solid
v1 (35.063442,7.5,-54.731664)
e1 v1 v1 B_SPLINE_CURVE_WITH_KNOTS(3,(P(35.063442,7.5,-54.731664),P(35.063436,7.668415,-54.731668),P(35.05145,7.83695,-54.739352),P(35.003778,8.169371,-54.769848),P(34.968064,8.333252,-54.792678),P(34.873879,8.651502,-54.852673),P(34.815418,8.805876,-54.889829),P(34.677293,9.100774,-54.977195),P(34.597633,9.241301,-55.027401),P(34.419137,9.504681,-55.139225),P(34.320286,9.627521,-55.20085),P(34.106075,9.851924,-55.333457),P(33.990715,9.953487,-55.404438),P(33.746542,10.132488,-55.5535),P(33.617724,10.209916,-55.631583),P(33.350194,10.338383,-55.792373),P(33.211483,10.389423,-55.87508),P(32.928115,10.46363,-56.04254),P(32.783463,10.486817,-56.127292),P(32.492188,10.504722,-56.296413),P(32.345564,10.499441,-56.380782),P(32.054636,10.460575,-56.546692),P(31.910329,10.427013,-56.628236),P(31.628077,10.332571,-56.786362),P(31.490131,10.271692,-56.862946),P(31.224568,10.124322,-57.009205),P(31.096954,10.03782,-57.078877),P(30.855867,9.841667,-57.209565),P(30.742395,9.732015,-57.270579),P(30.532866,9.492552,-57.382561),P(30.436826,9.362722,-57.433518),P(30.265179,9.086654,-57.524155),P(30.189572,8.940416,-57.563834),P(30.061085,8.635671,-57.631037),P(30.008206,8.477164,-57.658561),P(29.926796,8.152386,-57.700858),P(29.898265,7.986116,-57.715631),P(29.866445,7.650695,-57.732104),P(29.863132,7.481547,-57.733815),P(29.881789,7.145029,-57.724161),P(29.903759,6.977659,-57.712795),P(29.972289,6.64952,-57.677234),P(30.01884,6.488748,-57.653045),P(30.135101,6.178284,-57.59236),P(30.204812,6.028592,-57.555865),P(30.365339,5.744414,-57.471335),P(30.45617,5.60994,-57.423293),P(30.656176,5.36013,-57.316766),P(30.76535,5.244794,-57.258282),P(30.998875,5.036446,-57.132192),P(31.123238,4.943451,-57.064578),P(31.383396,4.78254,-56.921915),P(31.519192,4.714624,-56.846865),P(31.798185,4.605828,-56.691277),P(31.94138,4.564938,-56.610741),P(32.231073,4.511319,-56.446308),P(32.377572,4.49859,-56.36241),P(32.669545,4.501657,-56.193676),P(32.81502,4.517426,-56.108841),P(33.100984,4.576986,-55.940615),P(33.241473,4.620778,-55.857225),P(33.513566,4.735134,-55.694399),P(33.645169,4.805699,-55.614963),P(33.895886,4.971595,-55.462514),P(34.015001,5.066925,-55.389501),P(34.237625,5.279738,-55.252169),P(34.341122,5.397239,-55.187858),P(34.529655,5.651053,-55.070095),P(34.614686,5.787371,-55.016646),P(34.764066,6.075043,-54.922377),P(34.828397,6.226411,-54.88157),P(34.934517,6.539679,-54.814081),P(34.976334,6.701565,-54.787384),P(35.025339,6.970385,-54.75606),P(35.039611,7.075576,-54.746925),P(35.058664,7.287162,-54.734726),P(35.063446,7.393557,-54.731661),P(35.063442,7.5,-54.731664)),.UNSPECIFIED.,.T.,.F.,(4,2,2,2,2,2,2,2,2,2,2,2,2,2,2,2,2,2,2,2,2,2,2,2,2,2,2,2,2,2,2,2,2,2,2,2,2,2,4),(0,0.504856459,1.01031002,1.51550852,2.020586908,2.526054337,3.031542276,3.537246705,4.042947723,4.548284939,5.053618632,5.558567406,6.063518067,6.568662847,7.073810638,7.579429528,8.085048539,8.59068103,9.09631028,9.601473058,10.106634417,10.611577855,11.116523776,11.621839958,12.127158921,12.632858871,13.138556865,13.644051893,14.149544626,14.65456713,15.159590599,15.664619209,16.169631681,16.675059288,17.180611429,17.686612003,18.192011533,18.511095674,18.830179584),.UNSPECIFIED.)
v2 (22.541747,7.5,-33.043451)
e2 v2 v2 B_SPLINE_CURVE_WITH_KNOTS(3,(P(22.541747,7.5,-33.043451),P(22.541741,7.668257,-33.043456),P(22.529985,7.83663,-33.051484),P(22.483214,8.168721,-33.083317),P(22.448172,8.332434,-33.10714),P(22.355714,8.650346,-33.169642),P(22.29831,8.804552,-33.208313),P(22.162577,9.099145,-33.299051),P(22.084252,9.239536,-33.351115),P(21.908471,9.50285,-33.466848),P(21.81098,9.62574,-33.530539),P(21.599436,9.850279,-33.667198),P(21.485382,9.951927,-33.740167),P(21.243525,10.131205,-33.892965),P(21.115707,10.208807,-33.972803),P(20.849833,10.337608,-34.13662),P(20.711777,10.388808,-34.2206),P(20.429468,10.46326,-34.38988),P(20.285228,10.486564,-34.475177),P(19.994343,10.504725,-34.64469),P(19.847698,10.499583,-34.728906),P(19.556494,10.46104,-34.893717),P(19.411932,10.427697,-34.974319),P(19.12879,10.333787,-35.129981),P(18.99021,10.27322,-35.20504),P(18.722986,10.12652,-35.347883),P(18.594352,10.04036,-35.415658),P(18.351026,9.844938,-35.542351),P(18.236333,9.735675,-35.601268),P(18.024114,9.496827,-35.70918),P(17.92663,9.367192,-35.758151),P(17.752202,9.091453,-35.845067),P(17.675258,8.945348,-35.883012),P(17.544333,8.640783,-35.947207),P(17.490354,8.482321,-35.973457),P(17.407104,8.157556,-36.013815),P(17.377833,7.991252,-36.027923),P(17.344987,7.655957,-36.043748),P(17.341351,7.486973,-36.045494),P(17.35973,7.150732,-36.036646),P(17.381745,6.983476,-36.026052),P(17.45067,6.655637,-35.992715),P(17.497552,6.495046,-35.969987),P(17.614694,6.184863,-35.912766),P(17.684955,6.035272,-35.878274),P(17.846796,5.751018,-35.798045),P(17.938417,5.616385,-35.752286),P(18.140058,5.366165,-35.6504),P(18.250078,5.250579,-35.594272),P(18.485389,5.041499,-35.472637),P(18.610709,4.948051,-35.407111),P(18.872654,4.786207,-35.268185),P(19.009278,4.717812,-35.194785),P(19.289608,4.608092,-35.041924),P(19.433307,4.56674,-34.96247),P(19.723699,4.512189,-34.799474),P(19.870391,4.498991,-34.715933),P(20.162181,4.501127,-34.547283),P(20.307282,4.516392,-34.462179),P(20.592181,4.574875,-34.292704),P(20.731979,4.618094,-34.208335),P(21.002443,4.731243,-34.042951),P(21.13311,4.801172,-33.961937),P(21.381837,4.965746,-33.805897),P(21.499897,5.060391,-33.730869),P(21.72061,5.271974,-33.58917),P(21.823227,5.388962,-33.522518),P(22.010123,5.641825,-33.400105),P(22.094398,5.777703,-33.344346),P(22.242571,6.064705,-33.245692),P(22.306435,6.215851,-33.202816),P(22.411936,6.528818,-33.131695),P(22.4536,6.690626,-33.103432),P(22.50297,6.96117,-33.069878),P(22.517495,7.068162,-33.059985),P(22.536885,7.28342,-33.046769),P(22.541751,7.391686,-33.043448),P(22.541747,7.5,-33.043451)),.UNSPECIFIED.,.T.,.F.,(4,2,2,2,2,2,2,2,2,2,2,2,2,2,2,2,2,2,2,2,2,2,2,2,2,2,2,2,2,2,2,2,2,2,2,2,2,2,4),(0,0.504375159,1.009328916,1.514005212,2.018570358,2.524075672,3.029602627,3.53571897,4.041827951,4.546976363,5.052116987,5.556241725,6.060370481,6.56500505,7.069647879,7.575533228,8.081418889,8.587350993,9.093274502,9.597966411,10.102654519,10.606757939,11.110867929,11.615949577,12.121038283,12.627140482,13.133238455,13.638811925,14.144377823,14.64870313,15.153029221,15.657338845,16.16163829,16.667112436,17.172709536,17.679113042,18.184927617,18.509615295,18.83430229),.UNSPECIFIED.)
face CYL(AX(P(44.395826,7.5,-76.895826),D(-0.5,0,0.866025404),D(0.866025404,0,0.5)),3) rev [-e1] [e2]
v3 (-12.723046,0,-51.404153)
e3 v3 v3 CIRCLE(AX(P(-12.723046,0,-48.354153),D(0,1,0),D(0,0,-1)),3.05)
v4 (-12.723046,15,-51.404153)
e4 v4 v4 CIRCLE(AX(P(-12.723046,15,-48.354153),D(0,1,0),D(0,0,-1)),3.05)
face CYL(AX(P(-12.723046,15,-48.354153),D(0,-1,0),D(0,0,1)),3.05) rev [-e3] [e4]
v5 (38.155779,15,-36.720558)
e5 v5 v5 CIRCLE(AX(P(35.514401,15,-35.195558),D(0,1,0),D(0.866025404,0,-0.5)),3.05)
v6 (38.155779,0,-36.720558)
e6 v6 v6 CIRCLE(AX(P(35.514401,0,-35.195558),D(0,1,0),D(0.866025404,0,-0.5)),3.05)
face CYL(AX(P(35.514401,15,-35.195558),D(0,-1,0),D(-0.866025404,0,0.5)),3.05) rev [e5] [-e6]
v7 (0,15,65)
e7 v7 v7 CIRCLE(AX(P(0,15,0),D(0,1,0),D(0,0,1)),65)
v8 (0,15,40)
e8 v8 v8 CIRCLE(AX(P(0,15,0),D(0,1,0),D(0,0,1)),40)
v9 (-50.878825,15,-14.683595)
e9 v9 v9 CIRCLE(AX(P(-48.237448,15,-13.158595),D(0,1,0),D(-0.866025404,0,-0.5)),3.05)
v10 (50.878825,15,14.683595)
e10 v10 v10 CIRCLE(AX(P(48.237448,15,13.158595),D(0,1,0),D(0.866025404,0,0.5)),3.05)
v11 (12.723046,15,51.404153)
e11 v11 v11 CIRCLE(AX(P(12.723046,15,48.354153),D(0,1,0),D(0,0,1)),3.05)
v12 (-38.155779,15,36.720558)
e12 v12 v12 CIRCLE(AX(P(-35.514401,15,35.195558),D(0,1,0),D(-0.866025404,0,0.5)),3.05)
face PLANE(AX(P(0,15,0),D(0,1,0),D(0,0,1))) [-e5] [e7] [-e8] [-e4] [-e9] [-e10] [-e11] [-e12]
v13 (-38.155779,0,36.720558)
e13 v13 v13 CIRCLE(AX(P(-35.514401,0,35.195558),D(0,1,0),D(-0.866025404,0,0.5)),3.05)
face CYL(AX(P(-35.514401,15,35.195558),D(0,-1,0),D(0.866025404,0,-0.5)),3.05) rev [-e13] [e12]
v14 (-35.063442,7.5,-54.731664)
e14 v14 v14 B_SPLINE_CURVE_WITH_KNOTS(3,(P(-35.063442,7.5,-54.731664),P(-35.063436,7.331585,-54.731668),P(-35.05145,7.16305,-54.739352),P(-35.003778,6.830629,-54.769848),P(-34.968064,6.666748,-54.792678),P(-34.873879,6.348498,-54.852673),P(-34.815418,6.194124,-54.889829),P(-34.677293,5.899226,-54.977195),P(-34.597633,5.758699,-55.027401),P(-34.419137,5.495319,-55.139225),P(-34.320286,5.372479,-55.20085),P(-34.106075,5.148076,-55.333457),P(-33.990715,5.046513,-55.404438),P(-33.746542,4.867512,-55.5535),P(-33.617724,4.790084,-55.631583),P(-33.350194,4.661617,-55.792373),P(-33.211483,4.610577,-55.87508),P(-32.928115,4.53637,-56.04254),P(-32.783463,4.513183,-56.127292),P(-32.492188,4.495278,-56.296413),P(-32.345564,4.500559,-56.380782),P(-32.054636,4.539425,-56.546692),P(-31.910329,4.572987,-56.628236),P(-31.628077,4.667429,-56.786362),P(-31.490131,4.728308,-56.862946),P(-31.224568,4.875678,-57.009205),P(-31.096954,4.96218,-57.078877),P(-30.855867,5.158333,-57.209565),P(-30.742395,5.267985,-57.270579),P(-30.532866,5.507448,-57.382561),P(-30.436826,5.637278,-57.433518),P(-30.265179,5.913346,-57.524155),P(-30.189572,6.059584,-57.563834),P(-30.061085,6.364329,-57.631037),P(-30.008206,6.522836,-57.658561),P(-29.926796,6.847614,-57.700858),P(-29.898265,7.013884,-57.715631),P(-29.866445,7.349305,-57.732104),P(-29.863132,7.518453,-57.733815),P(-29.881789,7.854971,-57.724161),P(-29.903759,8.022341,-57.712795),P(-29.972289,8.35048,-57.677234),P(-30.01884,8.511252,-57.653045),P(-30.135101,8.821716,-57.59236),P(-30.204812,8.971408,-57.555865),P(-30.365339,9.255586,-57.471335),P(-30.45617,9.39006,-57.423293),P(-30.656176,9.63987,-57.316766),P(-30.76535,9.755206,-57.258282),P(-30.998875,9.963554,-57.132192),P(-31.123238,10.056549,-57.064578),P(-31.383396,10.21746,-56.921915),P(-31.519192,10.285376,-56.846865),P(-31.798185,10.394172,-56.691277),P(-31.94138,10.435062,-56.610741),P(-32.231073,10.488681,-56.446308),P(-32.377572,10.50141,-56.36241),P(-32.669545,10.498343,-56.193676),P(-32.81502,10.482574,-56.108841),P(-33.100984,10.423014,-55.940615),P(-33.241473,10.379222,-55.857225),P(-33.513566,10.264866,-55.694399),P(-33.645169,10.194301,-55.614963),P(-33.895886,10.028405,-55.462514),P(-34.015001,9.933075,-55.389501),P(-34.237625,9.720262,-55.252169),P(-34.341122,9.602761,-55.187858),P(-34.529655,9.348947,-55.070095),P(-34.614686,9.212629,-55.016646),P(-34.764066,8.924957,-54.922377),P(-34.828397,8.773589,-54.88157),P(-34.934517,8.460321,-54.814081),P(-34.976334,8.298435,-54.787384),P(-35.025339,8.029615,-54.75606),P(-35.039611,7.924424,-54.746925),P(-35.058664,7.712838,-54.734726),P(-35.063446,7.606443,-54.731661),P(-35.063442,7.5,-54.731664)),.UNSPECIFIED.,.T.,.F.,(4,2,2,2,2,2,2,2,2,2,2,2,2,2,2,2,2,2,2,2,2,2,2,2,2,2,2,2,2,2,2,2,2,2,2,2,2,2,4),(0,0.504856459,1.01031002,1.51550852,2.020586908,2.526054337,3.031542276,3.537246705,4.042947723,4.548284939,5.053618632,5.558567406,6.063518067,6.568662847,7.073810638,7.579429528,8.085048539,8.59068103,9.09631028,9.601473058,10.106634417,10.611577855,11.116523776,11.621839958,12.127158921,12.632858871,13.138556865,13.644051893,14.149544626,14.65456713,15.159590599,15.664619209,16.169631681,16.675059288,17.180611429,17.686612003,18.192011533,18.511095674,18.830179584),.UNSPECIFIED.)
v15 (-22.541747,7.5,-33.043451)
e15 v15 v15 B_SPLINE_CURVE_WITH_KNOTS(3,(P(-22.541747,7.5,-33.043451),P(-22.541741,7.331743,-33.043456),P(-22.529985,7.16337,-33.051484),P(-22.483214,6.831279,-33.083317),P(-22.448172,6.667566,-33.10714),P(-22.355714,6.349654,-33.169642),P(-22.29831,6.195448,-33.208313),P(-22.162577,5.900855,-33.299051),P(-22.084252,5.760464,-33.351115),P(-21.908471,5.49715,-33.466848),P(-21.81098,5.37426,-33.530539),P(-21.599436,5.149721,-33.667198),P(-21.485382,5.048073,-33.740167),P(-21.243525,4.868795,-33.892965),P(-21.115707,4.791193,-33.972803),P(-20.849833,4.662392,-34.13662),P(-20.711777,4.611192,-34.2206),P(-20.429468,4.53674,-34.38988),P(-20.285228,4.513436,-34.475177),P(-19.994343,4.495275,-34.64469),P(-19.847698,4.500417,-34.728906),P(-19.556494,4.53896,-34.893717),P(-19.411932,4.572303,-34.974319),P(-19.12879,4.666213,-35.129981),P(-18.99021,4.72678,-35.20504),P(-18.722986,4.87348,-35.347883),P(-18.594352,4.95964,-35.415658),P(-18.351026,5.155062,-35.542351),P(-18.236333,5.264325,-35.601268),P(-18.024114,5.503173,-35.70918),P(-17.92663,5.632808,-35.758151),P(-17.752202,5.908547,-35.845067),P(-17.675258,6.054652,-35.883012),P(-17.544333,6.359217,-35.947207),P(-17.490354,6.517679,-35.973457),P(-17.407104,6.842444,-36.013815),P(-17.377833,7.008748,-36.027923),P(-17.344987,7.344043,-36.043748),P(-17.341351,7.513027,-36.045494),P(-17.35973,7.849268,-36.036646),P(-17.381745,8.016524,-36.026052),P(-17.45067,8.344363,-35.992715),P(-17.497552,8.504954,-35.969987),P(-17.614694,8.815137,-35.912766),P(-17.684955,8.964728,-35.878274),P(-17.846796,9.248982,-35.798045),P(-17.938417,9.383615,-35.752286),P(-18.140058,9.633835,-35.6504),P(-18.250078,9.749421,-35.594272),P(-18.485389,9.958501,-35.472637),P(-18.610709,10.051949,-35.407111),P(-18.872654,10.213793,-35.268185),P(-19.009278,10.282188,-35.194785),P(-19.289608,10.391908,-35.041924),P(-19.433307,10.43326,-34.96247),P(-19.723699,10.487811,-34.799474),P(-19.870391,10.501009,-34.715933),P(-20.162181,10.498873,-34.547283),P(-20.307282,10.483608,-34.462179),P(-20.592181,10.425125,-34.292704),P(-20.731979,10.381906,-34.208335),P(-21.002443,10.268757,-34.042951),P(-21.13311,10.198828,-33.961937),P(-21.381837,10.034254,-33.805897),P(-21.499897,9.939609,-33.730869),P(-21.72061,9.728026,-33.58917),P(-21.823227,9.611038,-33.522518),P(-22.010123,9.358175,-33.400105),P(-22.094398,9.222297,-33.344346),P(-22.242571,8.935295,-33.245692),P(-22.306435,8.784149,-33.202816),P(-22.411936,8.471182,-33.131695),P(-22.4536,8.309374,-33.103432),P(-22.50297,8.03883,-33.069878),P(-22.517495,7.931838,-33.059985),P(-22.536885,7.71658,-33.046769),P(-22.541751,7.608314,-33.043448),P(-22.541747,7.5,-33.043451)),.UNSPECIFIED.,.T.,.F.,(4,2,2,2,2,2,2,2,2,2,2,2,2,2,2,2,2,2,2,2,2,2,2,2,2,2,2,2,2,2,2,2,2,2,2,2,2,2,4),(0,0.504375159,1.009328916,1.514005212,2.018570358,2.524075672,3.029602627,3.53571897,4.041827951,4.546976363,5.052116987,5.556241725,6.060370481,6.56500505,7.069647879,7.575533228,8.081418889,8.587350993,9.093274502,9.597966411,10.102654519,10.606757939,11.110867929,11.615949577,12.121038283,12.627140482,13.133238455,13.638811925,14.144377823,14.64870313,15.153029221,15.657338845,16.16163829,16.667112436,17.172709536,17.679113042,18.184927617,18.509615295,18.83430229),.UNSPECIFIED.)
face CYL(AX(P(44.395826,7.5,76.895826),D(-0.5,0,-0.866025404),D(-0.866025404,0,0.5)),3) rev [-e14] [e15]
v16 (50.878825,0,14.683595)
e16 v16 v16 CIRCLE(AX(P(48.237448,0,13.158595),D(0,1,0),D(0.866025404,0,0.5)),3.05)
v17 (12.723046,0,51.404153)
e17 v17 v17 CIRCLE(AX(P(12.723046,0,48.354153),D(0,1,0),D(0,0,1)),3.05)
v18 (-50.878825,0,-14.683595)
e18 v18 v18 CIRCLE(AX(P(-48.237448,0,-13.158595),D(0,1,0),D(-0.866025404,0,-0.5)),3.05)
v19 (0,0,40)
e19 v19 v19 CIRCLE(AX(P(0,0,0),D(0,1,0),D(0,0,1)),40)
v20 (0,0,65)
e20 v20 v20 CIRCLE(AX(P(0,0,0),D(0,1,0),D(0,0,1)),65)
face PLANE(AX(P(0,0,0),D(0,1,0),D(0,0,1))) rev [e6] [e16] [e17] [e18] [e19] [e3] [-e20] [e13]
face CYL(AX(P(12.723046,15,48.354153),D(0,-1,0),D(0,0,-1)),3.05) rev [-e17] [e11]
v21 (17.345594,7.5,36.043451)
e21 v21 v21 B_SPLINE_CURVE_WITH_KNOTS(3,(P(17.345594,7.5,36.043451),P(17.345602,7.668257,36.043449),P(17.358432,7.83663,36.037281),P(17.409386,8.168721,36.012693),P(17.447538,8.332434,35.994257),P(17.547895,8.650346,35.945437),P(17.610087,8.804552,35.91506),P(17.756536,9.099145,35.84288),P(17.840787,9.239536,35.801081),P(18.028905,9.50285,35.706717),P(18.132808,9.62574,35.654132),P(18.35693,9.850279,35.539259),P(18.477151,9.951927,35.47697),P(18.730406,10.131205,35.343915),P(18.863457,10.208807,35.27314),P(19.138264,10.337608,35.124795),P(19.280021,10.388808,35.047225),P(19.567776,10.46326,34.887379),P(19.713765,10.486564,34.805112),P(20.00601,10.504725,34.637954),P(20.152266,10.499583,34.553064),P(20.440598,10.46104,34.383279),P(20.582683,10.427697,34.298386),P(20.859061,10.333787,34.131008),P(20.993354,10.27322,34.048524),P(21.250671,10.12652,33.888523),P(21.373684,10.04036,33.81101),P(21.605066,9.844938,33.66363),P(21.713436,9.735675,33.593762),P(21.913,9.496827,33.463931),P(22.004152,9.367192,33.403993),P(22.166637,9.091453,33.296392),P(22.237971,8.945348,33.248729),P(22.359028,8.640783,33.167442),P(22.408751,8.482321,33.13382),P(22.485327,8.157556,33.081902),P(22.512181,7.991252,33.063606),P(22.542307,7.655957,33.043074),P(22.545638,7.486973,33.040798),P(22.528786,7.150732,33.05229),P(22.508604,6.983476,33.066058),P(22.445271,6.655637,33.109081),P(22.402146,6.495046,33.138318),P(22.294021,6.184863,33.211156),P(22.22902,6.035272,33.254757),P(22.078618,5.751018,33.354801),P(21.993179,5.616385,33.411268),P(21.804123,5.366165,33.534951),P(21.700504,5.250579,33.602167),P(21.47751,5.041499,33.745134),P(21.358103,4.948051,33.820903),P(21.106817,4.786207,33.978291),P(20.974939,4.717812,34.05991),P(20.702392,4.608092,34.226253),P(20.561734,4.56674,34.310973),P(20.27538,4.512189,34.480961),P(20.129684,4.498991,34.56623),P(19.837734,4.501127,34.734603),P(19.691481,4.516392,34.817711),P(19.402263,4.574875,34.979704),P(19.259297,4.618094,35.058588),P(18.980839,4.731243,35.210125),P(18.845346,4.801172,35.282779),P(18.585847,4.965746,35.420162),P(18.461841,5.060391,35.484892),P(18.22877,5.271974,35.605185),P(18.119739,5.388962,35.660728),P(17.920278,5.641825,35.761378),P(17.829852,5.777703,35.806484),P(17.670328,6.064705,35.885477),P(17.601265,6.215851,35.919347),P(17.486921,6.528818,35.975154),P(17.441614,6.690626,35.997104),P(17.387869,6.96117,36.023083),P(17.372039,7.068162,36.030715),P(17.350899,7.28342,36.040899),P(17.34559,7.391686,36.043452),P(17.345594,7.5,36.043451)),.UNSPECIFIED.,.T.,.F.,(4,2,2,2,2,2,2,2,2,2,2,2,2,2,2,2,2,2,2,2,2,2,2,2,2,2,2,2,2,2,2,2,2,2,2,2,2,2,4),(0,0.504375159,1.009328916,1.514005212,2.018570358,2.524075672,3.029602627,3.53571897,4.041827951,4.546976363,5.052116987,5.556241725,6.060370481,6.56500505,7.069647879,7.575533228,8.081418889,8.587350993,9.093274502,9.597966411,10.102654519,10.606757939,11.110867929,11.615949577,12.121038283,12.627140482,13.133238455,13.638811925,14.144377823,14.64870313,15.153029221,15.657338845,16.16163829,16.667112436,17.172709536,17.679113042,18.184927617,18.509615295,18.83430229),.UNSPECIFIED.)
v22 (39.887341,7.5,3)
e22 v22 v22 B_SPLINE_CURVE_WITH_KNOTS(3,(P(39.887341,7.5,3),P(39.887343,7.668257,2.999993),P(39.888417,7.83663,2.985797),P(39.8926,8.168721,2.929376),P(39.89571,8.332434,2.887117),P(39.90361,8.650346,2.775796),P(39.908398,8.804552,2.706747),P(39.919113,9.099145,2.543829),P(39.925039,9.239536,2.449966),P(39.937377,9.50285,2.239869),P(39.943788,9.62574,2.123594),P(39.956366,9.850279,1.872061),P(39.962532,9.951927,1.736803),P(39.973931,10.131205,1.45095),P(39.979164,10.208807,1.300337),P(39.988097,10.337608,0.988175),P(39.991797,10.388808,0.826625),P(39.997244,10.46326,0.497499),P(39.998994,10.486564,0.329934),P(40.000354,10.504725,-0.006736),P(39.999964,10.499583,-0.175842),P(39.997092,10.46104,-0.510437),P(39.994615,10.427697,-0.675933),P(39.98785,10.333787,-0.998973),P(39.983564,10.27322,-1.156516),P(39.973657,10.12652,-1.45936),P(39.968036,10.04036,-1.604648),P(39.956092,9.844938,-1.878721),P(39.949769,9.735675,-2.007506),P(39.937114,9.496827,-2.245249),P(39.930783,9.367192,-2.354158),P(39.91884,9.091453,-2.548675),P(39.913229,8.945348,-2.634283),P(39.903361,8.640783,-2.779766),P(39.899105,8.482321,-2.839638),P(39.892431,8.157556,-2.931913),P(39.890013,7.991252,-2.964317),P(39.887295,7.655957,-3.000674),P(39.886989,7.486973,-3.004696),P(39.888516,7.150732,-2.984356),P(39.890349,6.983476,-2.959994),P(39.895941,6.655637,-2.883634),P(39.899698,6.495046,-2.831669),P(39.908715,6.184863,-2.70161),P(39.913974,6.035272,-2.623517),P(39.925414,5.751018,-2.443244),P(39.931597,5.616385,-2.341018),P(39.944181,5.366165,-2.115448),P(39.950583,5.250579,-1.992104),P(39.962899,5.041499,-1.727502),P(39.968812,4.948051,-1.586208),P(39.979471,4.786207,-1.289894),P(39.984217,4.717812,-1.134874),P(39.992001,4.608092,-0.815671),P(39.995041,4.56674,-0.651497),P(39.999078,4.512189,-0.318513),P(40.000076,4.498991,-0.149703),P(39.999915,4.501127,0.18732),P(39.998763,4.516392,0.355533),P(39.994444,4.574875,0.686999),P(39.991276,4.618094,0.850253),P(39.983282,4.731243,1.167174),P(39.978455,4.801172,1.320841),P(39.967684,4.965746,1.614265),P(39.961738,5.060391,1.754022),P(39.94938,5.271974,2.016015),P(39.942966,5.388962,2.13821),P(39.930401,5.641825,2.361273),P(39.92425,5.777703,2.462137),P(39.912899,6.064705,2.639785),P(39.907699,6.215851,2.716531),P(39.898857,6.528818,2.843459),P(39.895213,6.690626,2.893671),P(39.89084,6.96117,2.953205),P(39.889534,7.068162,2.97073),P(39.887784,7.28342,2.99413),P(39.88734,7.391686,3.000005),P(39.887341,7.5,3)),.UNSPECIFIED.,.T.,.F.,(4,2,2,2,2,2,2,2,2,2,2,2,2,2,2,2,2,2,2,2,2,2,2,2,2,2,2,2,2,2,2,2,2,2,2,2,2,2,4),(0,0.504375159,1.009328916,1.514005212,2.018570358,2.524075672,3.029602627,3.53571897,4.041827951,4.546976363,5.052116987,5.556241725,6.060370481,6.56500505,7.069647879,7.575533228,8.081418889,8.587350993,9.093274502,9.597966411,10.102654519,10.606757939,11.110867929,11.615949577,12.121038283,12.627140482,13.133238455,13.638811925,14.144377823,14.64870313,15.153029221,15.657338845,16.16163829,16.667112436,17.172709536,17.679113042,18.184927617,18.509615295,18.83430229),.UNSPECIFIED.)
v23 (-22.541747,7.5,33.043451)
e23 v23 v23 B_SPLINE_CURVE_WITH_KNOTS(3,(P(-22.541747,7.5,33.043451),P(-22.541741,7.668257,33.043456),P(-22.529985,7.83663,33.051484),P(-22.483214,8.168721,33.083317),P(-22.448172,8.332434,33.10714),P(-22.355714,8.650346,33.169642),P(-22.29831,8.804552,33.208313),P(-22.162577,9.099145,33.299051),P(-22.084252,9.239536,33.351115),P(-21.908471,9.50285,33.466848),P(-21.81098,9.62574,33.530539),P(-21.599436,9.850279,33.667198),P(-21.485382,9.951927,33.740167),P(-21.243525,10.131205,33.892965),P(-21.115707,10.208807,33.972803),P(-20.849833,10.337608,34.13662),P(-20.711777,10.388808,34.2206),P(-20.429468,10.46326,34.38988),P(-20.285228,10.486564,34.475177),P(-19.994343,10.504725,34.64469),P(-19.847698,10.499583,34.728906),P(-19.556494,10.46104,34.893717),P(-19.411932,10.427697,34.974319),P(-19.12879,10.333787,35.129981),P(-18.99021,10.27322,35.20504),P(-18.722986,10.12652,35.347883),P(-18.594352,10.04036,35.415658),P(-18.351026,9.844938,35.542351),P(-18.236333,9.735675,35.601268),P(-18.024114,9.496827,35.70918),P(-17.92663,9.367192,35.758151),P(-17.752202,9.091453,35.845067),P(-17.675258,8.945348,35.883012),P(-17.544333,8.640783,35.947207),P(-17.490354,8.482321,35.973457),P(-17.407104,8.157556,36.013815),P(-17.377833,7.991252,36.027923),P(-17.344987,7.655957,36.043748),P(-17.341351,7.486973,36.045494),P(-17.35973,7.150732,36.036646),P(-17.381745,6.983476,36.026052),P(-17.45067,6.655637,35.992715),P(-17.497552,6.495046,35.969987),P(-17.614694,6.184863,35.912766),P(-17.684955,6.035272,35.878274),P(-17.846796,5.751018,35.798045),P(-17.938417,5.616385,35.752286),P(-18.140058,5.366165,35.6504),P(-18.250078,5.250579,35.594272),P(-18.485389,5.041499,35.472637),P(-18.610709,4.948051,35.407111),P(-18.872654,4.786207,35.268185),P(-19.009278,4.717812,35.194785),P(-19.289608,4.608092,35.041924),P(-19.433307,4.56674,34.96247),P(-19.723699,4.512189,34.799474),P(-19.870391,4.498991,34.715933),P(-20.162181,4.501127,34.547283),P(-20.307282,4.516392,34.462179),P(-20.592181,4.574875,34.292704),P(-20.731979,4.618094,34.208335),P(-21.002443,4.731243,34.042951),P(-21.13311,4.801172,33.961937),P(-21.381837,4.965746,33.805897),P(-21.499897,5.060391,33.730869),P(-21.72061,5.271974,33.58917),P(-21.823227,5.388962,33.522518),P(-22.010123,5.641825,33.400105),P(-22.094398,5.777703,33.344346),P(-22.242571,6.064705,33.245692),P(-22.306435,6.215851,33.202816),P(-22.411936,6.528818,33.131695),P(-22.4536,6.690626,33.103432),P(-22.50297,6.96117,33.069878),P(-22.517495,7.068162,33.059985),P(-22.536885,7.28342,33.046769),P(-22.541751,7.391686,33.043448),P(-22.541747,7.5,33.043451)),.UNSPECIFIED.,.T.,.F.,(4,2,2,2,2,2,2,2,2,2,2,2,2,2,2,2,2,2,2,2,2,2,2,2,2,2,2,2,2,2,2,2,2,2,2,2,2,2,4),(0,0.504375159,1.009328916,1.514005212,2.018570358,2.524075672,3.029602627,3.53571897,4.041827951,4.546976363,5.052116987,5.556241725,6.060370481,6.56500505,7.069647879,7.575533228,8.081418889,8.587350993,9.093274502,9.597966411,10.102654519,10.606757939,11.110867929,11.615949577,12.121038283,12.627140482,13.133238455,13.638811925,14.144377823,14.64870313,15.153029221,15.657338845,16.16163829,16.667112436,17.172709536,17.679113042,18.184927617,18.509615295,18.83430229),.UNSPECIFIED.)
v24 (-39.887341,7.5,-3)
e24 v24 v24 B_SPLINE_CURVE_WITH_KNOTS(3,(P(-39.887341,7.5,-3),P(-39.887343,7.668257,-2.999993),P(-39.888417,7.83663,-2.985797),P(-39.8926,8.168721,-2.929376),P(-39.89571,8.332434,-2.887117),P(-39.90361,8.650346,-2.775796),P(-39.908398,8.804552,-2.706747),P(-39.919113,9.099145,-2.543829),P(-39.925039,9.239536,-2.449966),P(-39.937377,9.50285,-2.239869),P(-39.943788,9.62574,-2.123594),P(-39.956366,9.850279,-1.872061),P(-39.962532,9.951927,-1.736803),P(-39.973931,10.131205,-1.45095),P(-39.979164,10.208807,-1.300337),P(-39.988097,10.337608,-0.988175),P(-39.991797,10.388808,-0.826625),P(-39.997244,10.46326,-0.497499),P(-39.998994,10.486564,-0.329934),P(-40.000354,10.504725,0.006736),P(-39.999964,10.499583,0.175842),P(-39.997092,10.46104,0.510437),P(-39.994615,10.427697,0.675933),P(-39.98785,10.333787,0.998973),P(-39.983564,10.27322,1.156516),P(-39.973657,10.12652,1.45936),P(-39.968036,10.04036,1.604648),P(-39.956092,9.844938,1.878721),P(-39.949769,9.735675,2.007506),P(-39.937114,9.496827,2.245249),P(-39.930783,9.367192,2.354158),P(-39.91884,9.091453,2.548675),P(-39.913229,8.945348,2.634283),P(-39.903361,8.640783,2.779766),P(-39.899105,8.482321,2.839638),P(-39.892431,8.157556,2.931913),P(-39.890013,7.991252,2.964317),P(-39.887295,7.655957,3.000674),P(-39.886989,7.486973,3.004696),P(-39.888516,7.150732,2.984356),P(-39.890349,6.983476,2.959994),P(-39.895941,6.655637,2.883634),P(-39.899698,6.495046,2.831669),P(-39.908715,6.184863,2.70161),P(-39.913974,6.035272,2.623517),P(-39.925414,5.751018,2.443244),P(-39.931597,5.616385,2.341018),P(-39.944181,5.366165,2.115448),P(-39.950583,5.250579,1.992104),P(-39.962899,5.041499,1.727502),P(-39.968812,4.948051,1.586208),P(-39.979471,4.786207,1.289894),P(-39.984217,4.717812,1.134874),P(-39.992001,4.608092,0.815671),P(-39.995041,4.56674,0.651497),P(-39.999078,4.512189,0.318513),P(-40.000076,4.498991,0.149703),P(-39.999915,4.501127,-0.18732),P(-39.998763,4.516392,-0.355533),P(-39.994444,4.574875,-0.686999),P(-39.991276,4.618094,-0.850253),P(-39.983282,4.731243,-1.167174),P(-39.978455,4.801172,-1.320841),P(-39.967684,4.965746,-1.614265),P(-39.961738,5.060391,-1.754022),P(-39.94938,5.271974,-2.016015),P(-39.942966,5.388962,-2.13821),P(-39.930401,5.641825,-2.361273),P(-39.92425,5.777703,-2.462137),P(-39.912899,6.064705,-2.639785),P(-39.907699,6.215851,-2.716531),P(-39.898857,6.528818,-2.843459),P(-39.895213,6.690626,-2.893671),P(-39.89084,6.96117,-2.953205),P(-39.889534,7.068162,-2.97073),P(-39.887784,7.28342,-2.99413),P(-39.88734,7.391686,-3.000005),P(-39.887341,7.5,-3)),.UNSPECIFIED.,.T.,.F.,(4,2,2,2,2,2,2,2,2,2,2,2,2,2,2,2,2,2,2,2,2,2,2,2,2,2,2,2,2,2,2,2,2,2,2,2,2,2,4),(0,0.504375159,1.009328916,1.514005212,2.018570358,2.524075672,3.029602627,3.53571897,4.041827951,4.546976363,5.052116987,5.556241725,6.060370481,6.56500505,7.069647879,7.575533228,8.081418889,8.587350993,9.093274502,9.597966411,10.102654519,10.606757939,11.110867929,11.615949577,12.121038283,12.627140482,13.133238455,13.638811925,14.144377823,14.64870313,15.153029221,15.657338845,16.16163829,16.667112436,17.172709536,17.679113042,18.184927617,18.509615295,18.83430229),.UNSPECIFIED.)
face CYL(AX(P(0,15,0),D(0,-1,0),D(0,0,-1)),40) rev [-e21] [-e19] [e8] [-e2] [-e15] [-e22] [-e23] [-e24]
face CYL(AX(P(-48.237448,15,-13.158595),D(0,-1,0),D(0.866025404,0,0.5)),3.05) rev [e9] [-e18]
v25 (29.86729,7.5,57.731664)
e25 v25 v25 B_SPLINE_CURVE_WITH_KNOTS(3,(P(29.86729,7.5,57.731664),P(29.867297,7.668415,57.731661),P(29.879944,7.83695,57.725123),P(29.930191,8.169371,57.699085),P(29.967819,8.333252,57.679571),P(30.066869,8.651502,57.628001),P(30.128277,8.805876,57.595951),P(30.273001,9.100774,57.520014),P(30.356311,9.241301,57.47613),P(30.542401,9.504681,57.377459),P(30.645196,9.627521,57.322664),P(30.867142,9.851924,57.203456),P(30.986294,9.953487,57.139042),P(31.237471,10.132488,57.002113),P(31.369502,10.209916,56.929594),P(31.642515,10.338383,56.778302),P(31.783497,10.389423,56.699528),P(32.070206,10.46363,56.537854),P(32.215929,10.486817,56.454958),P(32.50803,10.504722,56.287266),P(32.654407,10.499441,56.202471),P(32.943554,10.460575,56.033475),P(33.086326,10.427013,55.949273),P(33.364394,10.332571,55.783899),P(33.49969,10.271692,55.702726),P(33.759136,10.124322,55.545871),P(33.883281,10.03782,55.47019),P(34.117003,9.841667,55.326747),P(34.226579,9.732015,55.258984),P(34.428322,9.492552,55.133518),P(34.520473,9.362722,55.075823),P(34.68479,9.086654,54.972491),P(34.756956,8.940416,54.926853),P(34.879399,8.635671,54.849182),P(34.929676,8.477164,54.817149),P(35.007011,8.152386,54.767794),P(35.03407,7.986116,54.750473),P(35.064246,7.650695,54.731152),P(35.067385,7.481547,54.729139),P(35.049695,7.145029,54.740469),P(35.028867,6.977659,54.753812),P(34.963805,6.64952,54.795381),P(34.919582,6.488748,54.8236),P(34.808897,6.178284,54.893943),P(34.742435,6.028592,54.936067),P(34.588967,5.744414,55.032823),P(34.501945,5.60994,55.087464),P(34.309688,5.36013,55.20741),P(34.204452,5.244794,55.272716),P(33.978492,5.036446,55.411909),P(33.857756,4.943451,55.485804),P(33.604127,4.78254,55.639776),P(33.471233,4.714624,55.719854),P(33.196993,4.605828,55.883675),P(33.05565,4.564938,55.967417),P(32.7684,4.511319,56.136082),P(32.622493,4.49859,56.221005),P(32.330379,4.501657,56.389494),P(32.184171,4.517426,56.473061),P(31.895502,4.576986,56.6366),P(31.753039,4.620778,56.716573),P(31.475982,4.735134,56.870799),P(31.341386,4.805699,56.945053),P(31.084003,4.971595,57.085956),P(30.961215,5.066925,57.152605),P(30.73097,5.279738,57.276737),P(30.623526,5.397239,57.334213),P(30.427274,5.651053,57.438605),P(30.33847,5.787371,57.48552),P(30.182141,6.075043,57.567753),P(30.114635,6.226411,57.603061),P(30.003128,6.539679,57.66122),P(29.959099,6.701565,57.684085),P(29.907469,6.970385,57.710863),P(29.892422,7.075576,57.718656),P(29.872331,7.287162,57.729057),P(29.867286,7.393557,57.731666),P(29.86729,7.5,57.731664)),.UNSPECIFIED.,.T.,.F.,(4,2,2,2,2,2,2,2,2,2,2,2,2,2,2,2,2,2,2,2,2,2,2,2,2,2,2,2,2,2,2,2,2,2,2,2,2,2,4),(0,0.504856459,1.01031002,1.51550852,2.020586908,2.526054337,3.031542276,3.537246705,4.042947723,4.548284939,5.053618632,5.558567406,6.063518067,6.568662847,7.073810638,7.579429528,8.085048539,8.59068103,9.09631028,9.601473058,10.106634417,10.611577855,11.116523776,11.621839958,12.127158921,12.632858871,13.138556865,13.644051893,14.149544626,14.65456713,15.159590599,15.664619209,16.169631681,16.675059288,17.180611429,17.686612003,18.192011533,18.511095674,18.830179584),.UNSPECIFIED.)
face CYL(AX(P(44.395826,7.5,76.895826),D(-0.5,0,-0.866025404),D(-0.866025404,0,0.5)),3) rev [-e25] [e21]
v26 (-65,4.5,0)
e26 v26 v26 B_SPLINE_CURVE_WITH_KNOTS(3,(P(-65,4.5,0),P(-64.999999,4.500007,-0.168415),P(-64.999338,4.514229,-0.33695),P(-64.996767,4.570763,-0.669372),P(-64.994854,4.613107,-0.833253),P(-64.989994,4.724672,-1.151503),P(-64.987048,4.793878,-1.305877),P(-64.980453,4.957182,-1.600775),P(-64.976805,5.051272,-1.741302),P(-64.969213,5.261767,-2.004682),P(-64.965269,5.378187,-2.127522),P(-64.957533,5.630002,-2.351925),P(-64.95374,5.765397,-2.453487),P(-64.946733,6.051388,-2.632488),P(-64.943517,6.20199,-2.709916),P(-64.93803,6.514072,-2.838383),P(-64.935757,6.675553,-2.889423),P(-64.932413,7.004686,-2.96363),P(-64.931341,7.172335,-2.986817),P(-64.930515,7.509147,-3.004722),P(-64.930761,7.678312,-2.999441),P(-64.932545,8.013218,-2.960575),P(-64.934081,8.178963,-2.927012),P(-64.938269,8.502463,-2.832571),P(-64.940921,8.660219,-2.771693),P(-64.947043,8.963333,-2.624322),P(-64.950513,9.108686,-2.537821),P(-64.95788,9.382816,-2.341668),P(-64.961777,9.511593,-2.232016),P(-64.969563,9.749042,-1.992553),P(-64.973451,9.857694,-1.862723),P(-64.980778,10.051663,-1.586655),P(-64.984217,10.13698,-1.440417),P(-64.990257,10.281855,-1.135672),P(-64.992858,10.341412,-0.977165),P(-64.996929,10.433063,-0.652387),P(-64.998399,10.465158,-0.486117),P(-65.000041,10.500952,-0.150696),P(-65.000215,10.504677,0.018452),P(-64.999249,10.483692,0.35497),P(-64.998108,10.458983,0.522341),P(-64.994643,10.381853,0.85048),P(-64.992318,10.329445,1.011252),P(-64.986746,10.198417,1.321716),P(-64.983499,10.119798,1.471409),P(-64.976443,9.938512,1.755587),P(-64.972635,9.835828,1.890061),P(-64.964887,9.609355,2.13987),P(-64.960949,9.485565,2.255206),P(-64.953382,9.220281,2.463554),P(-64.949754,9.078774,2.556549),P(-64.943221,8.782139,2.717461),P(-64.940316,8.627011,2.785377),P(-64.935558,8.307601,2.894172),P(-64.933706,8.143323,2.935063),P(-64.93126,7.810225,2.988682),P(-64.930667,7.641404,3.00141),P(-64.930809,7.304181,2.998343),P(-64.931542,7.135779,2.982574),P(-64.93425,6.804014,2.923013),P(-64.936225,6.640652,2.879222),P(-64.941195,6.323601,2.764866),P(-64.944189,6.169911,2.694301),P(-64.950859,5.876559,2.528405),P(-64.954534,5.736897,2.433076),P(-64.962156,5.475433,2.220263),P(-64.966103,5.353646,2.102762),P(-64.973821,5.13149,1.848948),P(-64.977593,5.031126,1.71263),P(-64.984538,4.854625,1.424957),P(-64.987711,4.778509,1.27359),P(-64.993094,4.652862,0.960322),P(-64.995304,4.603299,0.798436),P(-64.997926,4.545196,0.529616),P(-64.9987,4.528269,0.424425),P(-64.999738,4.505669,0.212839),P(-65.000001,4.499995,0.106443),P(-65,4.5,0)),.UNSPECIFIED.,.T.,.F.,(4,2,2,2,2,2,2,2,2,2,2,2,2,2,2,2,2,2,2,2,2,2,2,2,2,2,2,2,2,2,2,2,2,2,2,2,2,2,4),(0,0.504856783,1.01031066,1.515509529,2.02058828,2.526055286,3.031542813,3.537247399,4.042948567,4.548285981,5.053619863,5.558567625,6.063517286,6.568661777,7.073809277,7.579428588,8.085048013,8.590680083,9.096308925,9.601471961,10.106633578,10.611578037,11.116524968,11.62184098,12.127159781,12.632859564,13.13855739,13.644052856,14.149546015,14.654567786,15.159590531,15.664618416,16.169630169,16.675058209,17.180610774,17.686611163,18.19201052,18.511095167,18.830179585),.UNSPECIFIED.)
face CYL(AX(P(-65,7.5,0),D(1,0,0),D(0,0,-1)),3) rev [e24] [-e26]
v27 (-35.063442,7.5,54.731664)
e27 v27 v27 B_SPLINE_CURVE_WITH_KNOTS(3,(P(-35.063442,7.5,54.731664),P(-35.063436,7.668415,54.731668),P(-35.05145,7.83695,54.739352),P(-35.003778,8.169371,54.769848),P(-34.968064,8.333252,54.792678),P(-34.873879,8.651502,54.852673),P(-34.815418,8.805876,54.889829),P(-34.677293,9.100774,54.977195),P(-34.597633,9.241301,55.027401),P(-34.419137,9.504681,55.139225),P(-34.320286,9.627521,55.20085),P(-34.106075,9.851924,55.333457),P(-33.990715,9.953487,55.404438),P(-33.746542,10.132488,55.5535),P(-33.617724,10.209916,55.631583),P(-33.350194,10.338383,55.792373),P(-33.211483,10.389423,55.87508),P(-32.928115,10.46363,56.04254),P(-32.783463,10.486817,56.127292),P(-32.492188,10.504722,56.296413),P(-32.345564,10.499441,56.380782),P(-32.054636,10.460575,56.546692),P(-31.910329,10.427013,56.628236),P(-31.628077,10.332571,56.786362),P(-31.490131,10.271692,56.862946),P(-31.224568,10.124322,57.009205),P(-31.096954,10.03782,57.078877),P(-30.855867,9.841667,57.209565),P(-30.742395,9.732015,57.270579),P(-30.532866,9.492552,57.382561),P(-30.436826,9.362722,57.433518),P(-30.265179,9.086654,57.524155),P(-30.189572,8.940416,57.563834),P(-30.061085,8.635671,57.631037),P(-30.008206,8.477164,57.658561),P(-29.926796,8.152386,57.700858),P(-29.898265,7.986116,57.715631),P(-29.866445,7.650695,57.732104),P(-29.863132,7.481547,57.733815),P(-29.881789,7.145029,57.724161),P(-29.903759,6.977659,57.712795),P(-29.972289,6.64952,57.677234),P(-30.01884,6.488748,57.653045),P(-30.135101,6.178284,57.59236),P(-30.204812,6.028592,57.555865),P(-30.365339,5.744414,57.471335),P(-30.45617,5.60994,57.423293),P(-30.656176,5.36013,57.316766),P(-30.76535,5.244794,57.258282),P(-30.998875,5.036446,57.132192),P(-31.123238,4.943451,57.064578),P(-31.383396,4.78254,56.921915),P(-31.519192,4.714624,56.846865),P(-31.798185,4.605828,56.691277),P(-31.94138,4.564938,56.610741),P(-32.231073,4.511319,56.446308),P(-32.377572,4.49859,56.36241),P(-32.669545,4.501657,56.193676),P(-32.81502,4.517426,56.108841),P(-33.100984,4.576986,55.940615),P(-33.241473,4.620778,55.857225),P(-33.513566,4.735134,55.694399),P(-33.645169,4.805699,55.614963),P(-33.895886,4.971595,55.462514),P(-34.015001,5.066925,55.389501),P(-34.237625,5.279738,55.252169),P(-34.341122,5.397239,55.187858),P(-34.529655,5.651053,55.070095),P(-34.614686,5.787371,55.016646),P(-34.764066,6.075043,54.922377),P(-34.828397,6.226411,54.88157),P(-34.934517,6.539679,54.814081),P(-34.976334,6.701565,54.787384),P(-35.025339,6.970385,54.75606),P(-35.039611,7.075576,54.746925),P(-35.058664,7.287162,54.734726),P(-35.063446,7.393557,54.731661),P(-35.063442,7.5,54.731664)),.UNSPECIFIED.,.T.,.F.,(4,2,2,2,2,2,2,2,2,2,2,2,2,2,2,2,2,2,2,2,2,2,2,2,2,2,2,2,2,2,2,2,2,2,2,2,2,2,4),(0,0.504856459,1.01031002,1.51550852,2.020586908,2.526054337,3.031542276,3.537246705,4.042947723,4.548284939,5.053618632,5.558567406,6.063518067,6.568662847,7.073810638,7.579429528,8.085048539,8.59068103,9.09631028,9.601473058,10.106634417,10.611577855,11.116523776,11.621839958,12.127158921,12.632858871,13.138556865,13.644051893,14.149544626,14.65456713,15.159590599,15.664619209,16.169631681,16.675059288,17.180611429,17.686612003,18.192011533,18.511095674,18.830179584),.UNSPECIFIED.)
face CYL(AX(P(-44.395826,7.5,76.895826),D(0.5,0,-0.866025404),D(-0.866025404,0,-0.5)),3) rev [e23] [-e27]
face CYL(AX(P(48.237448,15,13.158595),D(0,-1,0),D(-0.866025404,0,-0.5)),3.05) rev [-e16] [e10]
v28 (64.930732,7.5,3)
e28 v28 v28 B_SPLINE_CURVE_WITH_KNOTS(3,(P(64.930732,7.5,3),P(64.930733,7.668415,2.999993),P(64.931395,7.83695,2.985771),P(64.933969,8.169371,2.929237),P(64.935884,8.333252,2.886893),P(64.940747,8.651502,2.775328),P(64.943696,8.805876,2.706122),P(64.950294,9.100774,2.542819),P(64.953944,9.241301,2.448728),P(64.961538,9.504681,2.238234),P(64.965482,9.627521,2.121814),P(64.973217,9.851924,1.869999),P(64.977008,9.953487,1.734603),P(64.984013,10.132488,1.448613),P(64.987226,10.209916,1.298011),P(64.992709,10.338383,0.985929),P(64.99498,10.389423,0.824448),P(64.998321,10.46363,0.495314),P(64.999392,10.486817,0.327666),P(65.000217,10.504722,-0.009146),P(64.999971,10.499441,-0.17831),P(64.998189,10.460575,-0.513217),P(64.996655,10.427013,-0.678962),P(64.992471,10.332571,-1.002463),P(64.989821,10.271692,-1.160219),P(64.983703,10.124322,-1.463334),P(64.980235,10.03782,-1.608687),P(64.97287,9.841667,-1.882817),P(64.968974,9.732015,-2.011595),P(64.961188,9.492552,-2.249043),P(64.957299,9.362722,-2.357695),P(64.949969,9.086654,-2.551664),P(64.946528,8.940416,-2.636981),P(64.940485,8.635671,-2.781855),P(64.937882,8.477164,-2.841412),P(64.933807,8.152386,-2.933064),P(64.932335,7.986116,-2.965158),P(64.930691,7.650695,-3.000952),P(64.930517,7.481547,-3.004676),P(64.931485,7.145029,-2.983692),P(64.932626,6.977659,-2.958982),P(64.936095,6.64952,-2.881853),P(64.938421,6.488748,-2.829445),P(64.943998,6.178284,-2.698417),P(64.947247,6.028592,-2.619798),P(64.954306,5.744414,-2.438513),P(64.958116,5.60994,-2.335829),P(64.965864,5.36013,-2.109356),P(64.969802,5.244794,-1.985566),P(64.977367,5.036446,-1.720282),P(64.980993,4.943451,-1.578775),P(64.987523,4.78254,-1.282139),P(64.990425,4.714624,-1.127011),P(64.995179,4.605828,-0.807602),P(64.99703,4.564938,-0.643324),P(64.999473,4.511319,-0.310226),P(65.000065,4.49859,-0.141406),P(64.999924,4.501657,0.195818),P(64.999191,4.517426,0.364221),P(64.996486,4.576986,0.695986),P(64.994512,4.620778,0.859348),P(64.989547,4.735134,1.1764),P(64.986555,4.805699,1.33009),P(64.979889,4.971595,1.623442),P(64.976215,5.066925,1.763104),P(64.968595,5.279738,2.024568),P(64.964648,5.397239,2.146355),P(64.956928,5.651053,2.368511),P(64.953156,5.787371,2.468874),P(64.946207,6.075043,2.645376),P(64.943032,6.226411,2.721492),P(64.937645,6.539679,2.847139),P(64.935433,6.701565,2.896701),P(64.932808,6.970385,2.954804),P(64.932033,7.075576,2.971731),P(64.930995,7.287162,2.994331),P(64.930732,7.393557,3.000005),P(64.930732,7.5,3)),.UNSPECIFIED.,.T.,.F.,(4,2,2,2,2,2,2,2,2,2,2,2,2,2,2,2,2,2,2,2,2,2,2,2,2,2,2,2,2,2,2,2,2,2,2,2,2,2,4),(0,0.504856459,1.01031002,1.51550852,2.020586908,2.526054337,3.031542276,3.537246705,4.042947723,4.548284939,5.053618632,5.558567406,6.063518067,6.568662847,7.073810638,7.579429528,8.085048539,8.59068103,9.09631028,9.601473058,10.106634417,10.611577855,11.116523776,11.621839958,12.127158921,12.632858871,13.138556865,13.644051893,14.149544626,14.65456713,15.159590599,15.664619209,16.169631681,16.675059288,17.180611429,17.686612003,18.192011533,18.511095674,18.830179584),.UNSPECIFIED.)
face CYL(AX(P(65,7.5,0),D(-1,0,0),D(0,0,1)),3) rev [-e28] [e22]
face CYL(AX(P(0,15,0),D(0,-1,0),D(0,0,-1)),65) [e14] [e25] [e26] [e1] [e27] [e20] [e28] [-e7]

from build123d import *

# Parameters (mm, degrees)
SKETCH1_R             = 65
SKETCH1_R_2           = 40
SKETCH1_R_3           = 3.05
BOSS_EXTRUDE1_DEPTH   = 15
SKETCH2_R             = 3
CUT_EXTRUDE1_DEPTH    = 94.139680051
CIRPATTERN1_COUNT     = 6
CIRPATTERN2_OUTLINE_R = 3.05
CIRPATTERN2_DEPTH     = 15


# Read off the part's stored shape, not the designer's step: CirPattern2
with BuildPart() as part:
    # Sketch1 → Boss-Extrude1 (new body)
    with BuildSketch(Plane(origin=(0, 0, 0), x_dir=(1, 0, 0), z_dir=(0, 1, 0))):
        with Locations(Location((0, 0, 0), (0, 0, 270))):
            Circle(SKETCH1_R)
        with Locations(Location((0, 0, 0), (0, 0, 270))):
            Circle(SKETCH1_R_2, mode=Mode.SUBTRACT)
        with Locations(Location((12.723046489, -48.354152749, 0), (0, 0, 270))):
            Circle(SKETCH1_R_3, mode=Mode.SUBTRACT)
    extrude(amount=BOSS_EXTRUDE1_DEPTH)

    # Sketch2 → Cut-Extrude1 (cut, through all)
    with BuildSketch(Plane(origin=(0, 0, 0), x_dir=(0, 0, -1), z_dir=(1, 0, 0))):
        with Locations((0, 7.5)):
            Circle(SKETCH2_R)
    cut_extrude1 = extrude(amount=-CUT_EXTRUDE1_DEPTH, mode=Mode.SUBTRACT)

    # CirPattern1: Cut-Extrude1 ×6 about axis
    cirpattern1_axis = Axis((0, 15, 0), (0, 1, 0))
    for i in range(1, CIRPATTERN1_COUNT):
        add(cut_extrude1.rotate(cirpattern1_axis, i * 360 / CIRPATTERN1_COUNT), mode=Mode.SUBTRACT)

    # CirPattern2 outline → CirPattern2 (cut)
    with BuildSketch(Plane(origin=(0, 0, 0), x_dir=(1, 0, 0), z_dir=(0, 1, 0))):
        with Locations((-35.514401414, -35.195557847)):
            Circle(CIRPATTERN2_OUTLINE_R)
        with Locations((-48.237447903, 13.158594901)):
            Circle(CIRPATTERN2_OUTLINE_R)
        with Locations((-12.723046489, 48.354152749)):
            Circle(CIRPATTERN2_OUTLINE_R)
        with Locations((35.514401414, 35.195557847)):
            Circle(CIRPATTERN2_OUTLINE_R)
        with Locations((48.237447903, -13.158594901)):
            Circle(CIRPATTERN2_OUTLINE_R)
    extrude(amount=CIRPATTERN2_DEPTH, mode=Mode.SUBTRACT)


solid = part.part
